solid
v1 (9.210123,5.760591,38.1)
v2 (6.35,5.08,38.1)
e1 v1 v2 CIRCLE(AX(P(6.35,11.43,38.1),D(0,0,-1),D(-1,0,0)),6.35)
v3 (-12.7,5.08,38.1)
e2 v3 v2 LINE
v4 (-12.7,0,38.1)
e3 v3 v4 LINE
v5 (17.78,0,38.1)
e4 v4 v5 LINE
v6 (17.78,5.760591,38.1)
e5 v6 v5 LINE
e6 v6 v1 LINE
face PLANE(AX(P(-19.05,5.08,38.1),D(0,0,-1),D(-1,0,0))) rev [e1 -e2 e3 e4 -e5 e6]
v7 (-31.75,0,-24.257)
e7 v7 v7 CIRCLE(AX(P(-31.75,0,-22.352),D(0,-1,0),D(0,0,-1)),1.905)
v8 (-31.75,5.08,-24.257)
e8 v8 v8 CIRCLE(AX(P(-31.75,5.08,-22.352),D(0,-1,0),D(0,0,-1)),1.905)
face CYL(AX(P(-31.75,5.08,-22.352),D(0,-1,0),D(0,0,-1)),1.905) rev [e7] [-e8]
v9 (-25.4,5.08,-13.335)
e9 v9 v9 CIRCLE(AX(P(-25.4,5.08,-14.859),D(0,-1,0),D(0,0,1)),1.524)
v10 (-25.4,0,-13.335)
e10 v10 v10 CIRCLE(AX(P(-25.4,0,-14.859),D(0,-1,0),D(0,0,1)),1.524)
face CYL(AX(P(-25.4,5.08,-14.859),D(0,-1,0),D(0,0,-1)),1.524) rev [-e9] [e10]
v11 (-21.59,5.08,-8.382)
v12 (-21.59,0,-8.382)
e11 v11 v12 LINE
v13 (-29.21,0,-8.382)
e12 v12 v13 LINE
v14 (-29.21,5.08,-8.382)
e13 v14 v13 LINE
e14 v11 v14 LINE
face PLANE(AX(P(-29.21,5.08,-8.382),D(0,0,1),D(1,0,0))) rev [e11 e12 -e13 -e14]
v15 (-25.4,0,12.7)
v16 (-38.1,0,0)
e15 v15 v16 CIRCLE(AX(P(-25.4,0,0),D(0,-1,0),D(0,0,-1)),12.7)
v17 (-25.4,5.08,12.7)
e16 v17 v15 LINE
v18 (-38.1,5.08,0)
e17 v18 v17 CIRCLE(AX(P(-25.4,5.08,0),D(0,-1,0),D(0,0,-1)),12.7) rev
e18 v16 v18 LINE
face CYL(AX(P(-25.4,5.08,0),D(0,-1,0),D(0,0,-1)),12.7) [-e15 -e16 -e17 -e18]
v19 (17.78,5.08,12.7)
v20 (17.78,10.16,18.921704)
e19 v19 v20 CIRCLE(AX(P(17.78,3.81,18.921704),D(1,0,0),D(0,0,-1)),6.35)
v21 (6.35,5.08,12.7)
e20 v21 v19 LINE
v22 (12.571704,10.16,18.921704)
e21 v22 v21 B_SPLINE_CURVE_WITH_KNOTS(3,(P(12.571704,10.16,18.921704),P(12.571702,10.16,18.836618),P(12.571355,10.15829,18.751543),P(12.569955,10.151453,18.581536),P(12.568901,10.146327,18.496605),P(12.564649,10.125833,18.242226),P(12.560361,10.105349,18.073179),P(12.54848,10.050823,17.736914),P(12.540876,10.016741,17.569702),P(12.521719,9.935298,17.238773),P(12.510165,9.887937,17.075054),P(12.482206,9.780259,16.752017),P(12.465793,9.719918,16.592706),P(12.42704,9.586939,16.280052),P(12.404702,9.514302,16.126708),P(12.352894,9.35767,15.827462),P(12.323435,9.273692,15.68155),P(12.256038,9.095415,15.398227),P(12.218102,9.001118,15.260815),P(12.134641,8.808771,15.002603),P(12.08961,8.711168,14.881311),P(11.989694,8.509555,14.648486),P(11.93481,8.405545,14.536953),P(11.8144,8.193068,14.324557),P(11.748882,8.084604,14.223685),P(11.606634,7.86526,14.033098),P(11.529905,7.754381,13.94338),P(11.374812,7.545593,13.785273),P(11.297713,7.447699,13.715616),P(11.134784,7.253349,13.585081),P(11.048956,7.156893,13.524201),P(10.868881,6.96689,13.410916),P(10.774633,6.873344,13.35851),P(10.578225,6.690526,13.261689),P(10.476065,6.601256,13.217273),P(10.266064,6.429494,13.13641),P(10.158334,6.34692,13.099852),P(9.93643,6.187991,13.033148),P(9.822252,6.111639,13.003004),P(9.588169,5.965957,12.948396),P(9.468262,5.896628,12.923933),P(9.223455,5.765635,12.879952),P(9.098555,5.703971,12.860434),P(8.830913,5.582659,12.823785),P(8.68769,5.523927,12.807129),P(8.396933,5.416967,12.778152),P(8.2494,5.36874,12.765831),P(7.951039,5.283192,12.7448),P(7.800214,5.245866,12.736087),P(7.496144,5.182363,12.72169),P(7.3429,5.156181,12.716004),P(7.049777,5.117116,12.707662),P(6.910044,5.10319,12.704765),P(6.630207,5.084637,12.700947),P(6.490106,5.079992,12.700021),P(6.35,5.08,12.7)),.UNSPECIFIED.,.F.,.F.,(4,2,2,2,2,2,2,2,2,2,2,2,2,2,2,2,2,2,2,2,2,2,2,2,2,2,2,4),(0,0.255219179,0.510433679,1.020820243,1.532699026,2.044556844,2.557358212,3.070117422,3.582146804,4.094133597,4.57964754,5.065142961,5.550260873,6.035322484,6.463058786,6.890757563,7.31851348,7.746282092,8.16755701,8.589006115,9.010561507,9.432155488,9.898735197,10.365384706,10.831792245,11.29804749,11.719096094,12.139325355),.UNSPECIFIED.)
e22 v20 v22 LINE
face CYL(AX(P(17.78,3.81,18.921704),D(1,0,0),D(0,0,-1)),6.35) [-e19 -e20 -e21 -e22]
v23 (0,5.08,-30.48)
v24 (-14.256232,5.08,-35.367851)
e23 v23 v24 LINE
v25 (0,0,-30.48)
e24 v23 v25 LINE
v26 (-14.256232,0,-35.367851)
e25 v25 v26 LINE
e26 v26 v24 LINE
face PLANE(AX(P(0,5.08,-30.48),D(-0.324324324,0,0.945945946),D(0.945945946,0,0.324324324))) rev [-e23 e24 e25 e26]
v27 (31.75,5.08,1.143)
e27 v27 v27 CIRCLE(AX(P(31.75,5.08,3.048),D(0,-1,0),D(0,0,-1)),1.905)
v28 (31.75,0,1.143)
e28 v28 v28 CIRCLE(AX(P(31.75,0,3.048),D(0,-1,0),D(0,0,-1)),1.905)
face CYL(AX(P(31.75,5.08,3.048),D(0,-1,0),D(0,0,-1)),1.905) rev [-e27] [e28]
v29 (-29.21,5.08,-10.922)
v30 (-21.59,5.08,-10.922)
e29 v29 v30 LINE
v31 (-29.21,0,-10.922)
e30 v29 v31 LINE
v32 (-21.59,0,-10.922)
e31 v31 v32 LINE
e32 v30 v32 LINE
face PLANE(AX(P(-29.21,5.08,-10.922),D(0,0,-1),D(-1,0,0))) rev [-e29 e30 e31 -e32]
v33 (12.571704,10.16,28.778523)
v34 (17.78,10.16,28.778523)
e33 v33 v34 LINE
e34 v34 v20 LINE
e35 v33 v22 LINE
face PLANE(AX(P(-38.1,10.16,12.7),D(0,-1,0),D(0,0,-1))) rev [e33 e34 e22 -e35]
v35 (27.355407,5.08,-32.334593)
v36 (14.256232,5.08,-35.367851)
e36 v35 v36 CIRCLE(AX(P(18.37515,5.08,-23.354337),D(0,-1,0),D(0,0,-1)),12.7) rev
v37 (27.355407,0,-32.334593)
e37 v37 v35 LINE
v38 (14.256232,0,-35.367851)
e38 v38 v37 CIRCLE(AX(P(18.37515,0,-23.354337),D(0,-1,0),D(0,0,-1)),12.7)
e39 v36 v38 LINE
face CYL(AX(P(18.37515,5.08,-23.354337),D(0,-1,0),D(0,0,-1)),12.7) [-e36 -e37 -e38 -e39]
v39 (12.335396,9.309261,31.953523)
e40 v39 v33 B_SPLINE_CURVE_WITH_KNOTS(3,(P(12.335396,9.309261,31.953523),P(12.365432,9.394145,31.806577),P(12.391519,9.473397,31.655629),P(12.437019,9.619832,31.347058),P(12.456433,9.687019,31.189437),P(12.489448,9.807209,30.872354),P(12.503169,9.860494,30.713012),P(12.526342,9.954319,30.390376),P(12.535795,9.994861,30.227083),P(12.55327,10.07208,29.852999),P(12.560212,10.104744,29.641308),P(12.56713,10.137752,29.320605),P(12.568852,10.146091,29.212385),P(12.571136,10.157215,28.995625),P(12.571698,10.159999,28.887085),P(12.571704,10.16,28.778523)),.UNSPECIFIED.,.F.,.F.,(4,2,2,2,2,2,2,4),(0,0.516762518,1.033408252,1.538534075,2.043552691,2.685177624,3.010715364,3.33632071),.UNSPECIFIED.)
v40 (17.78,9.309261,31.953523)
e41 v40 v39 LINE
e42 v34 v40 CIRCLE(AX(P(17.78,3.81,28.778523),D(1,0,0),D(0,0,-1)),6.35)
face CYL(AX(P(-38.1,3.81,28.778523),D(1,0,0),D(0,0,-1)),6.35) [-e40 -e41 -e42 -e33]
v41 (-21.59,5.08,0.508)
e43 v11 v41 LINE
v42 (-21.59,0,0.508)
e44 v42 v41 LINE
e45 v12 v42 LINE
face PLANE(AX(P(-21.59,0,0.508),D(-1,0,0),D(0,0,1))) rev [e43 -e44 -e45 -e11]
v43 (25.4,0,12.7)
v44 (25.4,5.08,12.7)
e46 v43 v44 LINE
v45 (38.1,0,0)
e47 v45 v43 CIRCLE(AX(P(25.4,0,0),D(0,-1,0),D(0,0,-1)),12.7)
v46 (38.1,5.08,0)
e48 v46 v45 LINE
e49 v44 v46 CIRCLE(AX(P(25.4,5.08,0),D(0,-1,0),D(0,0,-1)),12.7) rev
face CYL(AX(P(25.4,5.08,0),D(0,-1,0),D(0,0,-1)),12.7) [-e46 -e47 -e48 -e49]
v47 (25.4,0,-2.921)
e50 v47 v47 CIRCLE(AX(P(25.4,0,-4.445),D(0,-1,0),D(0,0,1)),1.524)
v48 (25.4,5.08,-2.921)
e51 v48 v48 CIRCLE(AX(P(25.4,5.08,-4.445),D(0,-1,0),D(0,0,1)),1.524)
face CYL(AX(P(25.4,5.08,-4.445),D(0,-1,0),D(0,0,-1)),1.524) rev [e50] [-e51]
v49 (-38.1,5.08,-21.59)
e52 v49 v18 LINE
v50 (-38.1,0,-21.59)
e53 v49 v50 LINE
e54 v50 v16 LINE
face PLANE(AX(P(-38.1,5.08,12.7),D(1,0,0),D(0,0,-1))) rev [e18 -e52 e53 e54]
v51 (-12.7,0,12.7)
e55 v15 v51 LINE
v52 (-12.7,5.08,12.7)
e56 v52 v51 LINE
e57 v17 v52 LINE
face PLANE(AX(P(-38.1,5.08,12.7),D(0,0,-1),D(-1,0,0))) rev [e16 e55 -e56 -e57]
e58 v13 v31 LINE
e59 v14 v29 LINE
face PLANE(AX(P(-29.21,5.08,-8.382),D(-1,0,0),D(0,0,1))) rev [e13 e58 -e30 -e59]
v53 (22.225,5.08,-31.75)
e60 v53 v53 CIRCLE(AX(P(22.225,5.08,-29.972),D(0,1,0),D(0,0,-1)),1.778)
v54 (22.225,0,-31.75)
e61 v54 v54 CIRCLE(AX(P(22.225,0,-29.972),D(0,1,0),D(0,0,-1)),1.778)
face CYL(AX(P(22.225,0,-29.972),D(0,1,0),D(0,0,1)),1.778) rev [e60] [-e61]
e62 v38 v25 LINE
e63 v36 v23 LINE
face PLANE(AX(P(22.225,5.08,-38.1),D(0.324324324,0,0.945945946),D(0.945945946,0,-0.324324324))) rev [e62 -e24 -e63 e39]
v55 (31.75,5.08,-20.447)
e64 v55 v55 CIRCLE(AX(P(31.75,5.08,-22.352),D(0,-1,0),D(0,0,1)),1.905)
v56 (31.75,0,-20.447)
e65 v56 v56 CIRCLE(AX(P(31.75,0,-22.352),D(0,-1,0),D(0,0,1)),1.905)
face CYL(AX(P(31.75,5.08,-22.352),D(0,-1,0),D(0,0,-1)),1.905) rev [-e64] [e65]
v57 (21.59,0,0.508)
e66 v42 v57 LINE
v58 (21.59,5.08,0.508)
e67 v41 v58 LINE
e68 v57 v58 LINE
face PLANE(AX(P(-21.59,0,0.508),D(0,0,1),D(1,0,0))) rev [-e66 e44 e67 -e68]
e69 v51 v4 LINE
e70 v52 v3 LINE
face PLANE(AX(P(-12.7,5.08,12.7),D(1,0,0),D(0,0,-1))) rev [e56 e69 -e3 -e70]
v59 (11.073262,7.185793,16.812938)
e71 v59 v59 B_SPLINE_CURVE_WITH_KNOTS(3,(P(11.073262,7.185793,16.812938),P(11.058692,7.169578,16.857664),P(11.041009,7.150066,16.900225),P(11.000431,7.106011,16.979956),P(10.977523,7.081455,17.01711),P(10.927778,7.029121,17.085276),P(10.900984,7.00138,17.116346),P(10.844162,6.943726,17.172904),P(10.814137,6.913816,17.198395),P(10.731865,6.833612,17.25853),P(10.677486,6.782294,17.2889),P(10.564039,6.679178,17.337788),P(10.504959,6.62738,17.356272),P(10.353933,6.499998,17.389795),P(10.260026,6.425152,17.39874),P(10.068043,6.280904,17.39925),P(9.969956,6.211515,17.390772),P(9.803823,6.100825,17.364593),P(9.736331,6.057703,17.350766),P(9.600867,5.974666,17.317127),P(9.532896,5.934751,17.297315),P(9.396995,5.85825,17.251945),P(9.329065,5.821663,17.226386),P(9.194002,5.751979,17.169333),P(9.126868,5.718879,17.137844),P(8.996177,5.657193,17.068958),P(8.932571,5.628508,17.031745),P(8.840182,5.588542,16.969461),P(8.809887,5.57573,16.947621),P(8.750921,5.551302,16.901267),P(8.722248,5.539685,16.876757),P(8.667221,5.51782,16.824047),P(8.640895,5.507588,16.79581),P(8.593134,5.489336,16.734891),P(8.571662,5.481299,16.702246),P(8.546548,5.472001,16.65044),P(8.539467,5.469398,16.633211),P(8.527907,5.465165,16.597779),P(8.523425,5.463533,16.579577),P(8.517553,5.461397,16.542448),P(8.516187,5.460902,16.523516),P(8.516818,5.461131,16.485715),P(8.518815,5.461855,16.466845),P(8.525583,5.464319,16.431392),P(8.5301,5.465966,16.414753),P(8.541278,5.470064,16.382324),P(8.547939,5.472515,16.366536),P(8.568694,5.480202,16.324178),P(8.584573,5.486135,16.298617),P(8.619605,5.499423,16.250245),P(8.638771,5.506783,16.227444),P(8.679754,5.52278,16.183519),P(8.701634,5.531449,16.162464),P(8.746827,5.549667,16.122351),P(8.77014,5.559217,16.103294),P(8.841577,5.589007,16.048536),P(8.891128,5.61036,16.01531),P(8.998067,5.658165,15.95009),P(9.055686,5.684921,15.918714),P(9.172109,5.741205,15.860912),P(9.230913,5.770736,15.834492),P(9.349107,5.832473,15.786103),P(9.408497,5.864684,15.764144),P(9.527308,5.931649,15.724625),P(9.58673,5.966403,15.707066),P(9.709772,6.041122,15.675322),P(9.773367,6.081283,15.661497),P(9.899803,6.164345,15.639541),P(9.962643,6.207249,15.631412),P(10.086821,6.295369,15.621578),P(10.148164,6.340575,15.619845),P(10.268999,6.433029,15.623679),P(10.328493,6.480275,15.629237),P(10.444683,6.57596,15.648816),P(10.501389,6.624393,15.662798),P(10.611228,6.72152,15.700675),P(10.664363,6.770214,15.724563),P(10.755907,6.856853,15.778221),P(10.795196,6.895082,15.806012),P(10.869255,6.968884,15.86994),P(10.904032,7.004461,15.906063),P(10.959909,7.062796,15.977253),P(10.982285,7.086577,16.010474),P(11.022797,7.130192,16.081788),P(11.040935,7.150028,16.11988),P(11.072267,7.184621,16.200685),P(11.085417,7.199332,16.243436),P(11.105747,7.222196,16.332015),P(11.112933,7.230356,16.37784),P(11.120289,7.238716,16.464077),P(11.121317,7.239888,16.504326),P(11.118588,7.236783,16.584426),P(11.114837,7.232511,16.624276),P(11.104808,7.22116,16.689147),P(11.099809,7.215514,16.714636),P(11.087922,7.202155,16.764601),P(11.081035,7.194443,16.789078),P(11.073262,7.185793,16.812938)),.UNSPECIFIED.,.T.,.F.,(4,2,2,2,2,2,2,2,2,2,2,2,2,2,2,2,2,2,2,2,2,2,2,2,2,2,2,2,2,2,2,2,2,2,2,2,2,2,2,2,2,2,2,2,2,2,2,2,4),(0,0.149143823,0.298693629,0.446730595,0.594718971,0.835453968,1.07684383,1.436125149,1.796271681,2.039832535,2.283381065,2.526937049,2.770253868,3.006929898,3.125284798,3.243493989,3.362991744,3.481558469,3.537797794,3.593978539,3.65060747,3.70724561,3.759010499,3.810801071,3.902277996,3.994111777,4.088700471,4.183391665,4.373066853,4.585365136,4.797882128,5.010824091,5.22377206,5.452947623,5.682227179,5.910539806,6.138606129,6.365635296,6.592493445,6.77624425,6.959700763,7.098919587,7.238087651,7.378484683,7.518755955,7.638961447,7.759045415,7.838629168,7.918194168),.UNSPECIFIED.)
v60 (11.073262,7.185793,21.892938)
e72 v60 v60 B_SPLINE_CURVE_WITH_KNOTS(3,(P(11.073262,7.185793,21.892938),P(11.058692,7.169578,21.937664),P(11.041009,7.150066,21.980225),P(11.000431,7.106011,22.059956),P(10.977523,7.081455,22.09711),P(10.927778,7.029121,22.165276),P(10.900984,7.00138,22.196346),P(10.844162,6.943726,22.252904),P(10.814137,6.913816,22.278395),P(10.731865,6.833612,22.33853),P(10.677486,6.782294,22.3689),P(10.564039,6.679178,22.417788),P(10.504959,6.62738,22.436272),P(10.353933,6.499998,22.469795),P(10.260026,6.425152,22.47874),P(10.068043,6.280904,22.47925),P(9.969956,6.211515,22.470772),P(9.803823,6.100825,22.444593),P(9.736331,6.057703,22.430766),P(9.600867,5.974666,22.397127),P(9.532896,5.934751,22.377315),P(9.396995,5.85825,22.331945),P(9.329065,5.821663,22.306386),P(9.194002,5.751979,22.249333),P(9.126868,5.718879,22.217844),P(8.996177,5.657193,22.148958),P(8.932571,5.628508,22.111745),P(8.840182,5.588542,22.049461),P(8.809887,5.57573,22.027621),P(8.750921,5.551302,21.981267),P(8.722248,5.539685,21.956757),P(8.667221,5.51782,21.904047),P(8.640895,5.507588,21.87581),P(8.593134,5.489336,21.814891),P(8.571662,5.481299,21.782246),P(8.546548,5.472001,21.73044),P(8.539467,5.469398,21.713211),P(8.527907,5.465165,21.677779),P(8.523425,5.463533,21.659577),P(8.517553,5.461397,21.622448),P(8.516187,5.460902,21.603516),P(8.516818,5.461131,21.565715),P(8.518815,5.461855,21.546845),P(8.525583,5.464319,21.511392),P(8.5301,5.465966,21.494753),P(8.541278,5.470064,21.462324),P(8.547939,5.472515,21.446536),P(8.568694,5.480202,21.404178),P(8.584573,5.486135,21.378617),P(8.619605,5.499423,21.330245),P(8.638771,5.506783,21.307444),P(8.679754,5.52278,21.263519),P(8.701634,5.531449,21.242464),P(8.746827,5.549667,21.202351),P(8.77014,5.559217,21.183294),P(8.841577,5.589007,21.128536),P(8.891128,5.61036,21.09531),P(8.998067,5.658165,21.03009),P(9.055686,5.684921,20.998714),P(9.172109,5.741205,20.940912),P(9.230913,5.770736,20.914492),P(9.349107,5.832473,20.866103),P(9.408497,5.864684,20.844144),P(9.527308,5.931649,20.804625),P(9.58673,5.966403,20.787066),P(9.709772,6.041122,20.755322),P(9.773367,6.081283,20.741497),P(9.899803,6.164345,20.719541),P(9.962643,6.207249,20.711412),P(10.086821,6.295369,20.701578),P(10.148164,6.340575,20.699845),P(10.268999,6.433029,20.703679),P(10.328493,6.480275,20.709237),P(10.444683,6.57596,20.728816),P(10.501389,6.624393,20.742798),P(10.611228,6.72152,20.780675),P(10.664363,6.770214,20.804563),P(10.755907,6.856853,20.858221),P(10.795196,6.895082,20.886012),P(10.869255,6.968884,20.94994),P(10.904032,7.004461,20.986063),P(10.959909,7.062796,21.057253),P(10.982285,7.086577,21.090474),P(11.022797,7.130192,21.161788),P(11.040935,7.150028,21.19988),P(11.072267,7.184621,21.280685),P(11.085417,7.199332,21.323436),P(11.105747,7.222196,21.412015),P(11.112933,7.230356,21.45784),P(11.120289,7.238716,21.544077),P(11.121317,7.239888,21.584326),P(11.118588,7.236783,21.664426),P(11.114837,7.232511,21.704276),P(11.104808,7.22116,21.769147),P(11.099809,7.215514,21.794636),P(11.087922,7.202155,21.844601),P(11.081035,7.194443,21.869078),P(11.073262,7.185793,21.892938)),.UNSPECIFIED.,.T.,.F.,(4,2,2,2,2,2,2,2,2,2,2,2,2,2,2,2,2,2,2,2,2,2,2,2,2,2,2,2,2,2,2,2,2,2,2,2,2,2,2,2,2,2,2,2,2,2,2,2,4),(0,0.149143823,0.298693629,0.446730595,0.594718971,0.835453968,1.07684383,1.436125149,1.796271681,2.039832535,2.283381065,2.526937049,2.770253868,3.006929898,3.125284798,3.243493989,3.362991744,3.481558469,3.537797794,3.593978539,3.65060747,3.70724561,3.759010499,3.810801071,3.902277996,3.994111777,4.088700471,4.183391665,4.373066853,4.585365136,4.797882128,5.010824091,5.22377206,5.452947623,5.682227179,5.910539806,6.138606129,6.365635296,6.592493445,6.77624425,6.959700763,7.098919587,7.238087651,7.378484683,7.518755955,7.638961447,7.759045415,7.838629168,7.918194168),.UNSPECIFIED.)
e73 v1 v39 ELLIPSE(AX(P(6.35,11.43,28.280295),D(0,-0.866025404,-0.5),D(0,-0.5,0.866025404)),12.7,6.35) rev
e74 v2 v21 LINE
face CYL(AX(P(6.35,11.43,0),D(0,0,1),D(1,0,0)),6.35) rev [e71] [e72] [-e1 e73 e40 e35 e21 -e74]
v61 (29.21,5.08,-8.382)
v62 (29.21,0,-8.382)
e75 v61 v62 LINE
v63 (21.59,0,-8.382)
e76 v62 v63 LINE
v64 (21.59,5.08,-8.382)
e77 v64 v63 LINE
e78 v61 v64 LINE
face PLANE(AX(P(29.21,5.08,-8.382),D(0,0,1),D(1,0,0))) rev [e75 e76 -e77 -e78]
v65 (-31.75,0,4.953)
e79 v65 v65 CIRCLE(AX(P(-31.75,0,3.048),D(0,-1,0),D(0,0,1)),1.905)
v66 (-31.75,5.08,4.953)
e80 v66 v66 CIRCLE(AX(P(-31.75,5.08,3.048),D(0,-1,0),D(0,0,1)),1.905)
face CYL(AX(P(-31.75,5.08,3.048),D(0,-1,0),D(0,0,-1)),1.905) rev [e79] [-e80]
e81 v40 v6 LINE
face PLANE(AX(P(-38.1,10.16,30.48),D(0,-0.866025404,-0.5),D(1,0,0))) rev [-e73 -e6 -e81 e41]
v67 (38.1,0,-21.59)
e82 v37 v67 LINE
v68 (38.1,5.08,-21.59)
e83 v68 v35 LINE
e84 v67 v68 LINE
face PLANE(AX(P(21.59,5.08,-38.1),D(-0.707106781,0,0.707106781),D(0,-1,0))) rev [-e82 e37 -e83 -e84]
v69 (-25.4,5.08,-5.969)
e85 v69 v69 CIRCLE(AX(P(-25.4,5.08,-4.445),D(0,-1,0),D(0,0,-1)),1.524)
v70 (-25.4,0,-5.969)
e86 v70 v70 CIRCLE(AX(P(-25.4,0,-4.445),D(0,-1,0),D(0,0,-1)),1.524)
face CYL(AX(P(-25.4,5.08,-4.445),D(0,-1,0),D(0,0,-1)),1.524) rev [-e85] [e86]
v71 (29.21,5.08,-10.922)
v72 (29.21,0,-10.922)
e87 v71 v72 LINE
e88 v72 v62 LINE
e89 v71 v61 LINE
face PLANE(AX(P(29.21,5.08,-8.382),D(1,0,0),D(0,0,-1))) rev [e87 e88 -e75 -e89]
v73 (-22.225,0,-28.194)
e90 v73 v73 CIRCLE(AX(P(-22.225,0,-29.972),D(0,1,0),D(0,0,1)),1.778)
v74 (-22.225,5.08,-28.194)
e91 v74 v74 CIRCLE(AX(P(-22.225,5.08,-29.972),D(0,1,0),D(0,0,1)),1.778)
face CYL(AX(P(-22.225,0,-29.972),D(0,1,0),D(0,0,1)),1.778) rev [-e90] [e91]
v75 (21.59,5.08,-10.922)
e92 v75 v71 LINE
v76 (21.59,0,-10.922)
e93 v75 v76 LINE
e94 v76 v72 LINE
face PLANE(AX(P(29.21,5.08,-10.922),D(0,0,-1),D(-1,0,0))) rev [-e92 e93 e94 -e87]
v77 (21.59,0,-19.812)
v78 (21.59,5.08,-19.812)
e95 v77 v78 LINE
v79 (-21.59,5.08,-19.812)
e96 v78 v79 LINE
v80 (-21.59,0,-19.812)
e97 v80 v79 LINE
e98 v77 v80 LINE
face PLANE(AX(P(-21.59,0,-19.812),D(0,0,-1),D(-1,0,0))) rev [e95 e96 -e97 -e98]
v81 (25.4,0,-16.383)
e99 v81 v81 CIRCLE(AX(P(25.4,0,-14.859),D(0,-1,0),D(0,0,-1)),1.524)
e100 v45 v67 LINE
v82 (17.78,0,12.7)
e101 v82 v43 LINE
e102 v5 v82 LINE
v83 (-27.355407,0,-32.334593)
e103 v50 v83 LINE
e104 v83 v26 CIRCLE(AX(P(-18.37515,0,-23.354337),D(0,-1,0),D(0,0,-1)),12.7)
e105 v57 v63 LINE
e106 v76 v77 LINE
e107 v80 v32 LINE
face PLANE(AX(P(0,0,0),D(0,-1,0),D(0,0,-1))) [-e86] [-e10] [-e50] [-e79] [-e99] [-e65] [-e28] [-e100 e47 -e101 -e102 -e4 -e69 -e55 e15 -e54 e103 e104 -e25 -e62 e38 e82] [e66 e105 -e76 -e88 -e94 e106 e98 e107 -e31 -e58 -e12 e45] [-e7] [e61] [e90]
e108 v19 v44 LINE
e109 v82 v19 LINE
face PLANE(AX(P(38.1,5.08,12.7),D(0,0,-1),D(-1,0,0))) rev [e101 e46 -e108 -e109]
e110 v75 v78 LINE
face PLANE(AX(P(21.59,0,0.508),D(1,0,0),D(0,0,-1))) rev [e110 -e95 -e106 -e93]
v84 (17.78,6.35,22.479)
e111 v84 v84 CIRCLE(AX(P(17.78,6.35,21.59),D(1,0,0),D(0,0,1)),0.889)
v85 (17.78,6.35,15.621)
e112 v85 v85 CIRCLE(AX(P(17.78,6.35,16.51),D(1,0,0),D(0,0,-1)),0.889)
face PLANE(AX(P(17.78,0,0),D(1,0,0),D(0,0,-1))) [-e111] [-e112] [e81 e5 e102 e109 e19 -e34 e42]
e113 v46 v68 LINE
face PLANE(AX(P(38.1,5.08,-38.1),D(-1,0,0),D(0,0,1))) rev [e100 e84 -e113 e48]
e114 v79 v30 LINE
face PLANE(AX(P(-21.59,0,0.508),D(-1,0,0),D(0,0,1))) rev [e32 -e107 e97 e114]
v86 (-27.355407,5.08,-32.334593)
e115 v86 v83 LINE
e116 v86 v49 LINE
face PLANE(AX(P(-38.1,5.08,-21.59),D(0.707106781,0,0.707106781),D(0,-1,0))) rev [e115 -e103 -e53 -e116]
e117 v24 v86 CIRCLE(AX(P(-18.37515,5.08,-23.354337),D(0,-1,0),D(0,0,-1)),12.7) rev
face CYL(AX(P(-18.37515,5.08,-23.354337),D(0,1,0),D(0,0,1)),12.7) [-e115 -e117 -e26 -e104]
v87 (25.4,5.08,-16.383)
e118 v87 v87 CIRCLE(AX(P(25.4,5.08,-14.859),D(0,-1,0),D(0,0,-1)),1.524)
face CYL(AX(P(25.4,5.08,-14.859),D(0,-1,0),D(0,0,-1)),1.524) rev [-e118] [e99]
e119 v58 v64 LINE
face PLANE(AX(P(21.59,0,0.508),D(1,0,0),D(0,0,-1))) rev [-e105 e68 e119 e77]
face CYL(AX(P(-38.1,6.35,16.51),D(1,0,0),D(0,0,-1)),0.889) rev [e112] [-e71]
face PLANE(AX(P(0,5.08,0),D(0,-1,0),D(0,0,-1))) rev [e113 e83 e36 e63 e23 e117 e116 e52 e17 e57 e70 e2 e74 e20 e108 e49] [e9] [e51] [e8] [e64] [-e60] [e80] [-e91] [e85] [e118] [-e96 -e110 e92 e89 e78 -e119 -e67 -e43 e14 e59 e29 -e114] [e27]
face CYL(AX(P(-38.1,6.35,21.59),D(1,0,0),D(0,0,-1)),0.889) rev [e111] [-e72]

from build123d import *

# Parameters (mm, degrees)
BOSS_EXTRUDE1_DEPTH = 5.08
SKETCH2_R           = 1.778
CUT_EXTRUDE1_DEPTH  = 55.120480412
SKETCH3_W           = 43.18
SKETCH3_H           = 20.32
CUT_EXTRUDE2_DEPTH  = 55.120480412
SKETCH10_R          = 1.524
CUT_EXTRUDE3_DEPTH  = 55.120480412
SKETCH11_W          = 7.62
SKETCH11_H          = 2.54
CUT_EXTRUDE4_DEPTH  = 55.120480412
CUT_EXTRUDE5_DEPTH  = 55.120480412
SKETCH14_R          = 1.905
CUT_EXTRUDE6_DEPTH  = 55.120480412
CHAMFER1_SIZE       = 16.51
CHAMFER3_SIZE       = 16.51
FILLET1_R           = 12.7
FILLET2_R           = 12.7
SKETCH15_W          = 6.35
SKETCH15_H          = 25.4
CUT_EXTRUDE7_DEPTH  = 55.120480412
SKETCH18_W          = 25.4
SKETCH18_H          = 12.7
BOSS_EXTRUDE3_DEPTH = 5.08
SKETCH19_R          = 0.889
CUT_EXTRUDE9_DEPTH  = 69.814783295
FILLET4_R           = 6.35
SKETCH20_W          = 25.4
SKETCH20_H          = 2.54
CUT_EXTRUDE10_DEPTH = 69.814783351
CHAMFER4_SIZE       = 7.62
CHAMFER4_SIZE2      = 4.399409051
FILLET5_R           = 6.35
FILLET6_R           = 6.35


with BuildPart() as part:
    # Sketch1 → Boss-Extrude1 (new body)
    with BuildSketch(Plane(origin=(0, 0, 0), x_dir=(1, 0, 0), z_dir=(0, 1, 0))):
        Polygon((-38.1, -12.7), (-38.1, 38.1), (38.1, 38.1), (38.1, -12.7), (19.05, -12.7), (19.05, -38.1), (-19.05, -38.1), (-19.05, -12.7), align=None)
    extrude(amount=BOSS_EXTRUDE1_DEPTH)

    # Sketch2 → Cut-Extrude1 (cut, through all)
    with BuildSketch(Plane(origin=(0, 5.08, 0), x_dir=(1, 0, 0), z_dir=(0, 1, 0))):
        with Locations(Location((-22.225, 29.972, 0), (0, 0, 270))):
            Circle(SKETCH2_R)
        with Locations(Location((22.225, 29.972, 0), (0, 0, 90))):
            Circle(SKETCH2_R)
    extrude(amount=-CUT_EXTRUDE1_DEPTH, mode=Mode.SUBTRACT)

    # Sketch3 → Cut-Extrude2 (cut, through all)
    with BuildSketch(Plane(origin=(0, 5.08, 0), x_dir=(1, 0, 0), z_dir=(0, 1, 0))):
        with Locations((0, 9.652)):
            Rectangle(SKETCH3_W, SKETCH3_H)
    extrude(amount=-CUT_EXTRUDE2_DEPTH, mode=Mode.SUBTRACT)

    # Sketch10 → Cut-Extrude3 (cut, through all)
    with BuildSketch(Plane.XZ):
        with Locations(Location((25.4, -14.859, 0), (0, 0, 270))):
            Circle(SKETCH10_R)
        with Locations(Location((25.4, -4.445, 0), (0, 0, 90))):
            Circle(SKETCH10_R)
        with Locations(Location((-25.4, -14.859, 0), (0, 0, 90))):
            Circle(SKETCH10_R)
        with Locations(Location((-25.4, -4.445, 0), (0, 0, 270))):
            Circle(SKETCH10_R)
    extrude(amount=-CUT_EXTRUDE3_DEPTH, mode=Mode.SUBTRACT)

    # Sketch11 → Cut-Extrude4 (cut, through all)
    with BuildSketch(Plane.XZ):
        with Locations((25.4, -9.652)):
            Rectangle(SKETCH11_W, SKETCH11_H)
        with Locations((-25.4, -9.652)):
            Rectangle(SKETCH11_W, SKETCH11_H)
    extrude(amount=-CUT_EXTRUDE4_DEPTH, mode=Mode.SUBTRACT)

    # Sketch12 → Cut-Extrude5 (cut, through all)
    with BuildSketch(Plane.XZ):
        Polygon((22.225, -38.1), (0, -30.48), (-22.225, -38.1), align=None)
    extrude(amount=-CUT_EXTRUDE5_DEPTH, mode=Mode.SUBTRACT)

    # Sketch14 → Cut-Extrude6 (cut, through all)
    with BuildSketch(Plane.XZ):
        with Locations(Location((31.75, 3.048, 0), (0, 0, 270))):
            Circle(SKETCH14_R)
        with Locations(Location((31.75, -22.352, 0), (0, 0, 90))):
            Circle(SKETCH14_R)
        with Locations(Location((-31.75, 3.048, 0), (0, 0, 90))):
            Circle(SKETCH14_R)
        with Locations(Location((-31.75, -22.352, 0), (0, 0, 270))):
            Circle(SKETCH14_R)
    extrude(amount=-CUT_EXTRUDE6_DEPTH, mode=Mode.SUBTRACT)

    # Chamfer1
    # the kernel refuses this chamfer: 16.51 mm, written as the material it takes off along each edge
    with BuildSketch(Plane(origin=(38.1, -42.458486131, -38.1), x_dir=(0.027495876610586233, 0, 0.9996219169112966), z_dir=(0, 1, 0))) as chamfer1_piece_1:
        Polygon((CHAMFER1_SIZE * 0.999621916911, -CHAMFER1_SIZE * 0.0274958766106), (-CHAMFER1_SIZE * 0.0274958766106, -CHAMFER1_SIZE * 0.999621916911), (0, 0), align=None)
    extrude(amount=89.996972263, mode=Mode.SUBTRACT)

    # Chamfer3
    # the kernel refuses this chamfer: 16.51 mm, written as the material it takes off along each edge
    with BuildSketch(Plane(origin=(-38.1, -42.458486131, -38.1), x_dir=(-0.02749587661058624, 0, 0.9996219169112966), z_dir=(0, 1, 0))) as chamfer3_piece_1:
        Polygon((CHAMFER3_SIZE * 0.999621916911, CHAMFER3_SIZE * 0.0274958766106), (-CHAMFER3_SIZE * 0.0274958766106, CHAMFER3_SIZE * 0.999621916911), (0, 0), align=None)
    extrude(amount=89.996972263, mode=Mode.SUBTRACT)

    # Fillet1
    fillet1_edges = [part.edges().sort_by_distance(p)[0] for p in [
        (21.75212766, 2.54, -37.93787234),
        (-21.75212766, 2.54, -37.93787234),
    ]]
    fillet(fillet1_edges, radius=FILLET1_R)

    # Fillet2
    fillet2_edges = [part.edges().sort_by_distance(p)[0] for p in [
        (38.1, 2.54, 12.7),
        (-38.1, 2.54, 12.7),
    ]]
    fillet(fillet2_edges, radius=FILLET2_R)

    # Sketch15 → Cut-Extrude7 (cut, through all)
    with BuildSketch(Plane.XZ):
        with Locations((15.875, 25.4)):
            Rectangle(SKETCH15_W, SKETCH15_H)
        with Locations((-15.875, 25.4)):
            Rectangle(SKETCH15_W, SKETCH15_H)
    extrude(amount=-CUT_EXTRUDE7_DEPTH, mode=Mode.SUBTRACT)

    # Sketch18 → Boss-Extrude3 (add)
    with BuildSketch(Plane(origin=(12.7, 0, 0), x_dir=(0, 0, -1), z_dir=(1, 0, 0))):
        with Locations((-25.4, 6.35)):
            Rectangle(SKETCH18_W, SKETCH18_H)
    extrude(amount=BOSS_EXTRUDE3_DEPTH)

    # Sketch19 → Cut-Extrude9 (cut, through all)
    with BuildSketch(Plane(origin=(17.78, 0, 0), x_dir=(0, 0, -1), z_dir=(1, 0, 0))):
        with Locations((-16.51, 6.35)):
            Circle(SKETCH19_R)
        with Locations((-21.59, 6.35)):
            Circle(SKETCH19_R)
    extrude(amount=-CUT_EXTRUDE9_DEPTH, mode=Mode.SUBTRACT)

    # Fillet4
    # the kernel refuses this fillet: 6.35 mm, written as the material it adds along each edge
    with BuildSketch(Plane(origin=(12.7, 5.08, 12.7), x_dir=(-1, 0, 0), z_dir=(0, 0, 1))) as fillet4_piece_1_section:
        with BuildLine():
            CenterArc((FILLET4_R, -FILLET4_R), FILLET4_R, 90, 90)
            Line((0, -FILLET4_R), (0, 0))
            Line((0, 0), (FILLET4_R, 0))
        make_face()
    fillet4_piece_1 = extrude(amount=25.4, mode=Mode.PRIVATE)
    fillet4_piece_1 = fillet4_piece_1 - Plane(origin=(11.255700074, 6.35, 16.51), x_dir=(0, 0, -1), z_dir=(1, 0, 0)) * Cylinder(0.889, 77, mode=Mode.PRIVATE)
    fillet4_piece_1 = fillet4_piece_1 - Plane(origin=(11.255700074, 6.35, 21.59), x_dir=(0, 0, -1), z_dir=(1, 0, 0)) * Cylinder(0.889, 77, mode=Mode.PRIVATE)
    add(fillet4_piece_1)

    # Sketch20 → Cut-Extrude10 (cut, through all)
    with BuildSketch(Plane(origin=(17.78, 0, 0), x_dir=(0, 0, -1), z_dir=(1, 0, 0))):
        with Locations((-25.4, 11.43)):
            Rectangle(SKETCH20_W, SKETCH20_H)
    extrude(amount=-CUT_EXTRUDE10_DEPTH, mode=Mode.SUBTRACT)

    # Chamfer4
    chamfer4_edges = [part.edges().sort_by_distance(p)[0] for p in [
        (15.175851973, 10.16, 38.1),
    ]]
    chamfer4_side = [part.faces().sort_by_distance(p)[0] for p in [
        (15.175851973, 10.16, 25.4),
    ]]
    chamfer(chamfer4_edges, length=CHAMFER4_SIZE, length2=CHAMFER4_SIZE2, reference=chamfer4_side[0])

    # Fillet5
    fillet5_edges = [part.edges().sort_by_distance(p)[0] for p in [
        (15.175851973, 10.16, 30.48),
    ]]
    fillet(fillet5_edges, radius=FILLET5_R)

    # Fillet6
    # the kernel refuses this fillet: 6.35 mm, written as the material it takes off along each edge
    with BuildSketch(Plane(origin=(33.334259867, 10.16, 12.7), x_dir=(0, 0, 1), z_dir=(-1, 0, 0))) as fillet6_piece_1:
        with BuildLine():
            CenterArc((6.221703947, -6.35), FILLET6_R, 90, 78.463040967)
            Line((0, -5.08), (-0.124434079, -5.0546))
            ThreePointArc((-0.124434079, -5.0546), (-0.127, -2.54), (-0.127, 0))
            Line((-0.127, 0), (0, 0.127))
            Line((0, 0.127), (6.221703947, 0.127))
            Line((6.221703947, 0.127), (6.221703947, 0))
        make_face()
    extrude(amount=36.316815787, mode=Mode.SUBTRACT)


solid = part.part
